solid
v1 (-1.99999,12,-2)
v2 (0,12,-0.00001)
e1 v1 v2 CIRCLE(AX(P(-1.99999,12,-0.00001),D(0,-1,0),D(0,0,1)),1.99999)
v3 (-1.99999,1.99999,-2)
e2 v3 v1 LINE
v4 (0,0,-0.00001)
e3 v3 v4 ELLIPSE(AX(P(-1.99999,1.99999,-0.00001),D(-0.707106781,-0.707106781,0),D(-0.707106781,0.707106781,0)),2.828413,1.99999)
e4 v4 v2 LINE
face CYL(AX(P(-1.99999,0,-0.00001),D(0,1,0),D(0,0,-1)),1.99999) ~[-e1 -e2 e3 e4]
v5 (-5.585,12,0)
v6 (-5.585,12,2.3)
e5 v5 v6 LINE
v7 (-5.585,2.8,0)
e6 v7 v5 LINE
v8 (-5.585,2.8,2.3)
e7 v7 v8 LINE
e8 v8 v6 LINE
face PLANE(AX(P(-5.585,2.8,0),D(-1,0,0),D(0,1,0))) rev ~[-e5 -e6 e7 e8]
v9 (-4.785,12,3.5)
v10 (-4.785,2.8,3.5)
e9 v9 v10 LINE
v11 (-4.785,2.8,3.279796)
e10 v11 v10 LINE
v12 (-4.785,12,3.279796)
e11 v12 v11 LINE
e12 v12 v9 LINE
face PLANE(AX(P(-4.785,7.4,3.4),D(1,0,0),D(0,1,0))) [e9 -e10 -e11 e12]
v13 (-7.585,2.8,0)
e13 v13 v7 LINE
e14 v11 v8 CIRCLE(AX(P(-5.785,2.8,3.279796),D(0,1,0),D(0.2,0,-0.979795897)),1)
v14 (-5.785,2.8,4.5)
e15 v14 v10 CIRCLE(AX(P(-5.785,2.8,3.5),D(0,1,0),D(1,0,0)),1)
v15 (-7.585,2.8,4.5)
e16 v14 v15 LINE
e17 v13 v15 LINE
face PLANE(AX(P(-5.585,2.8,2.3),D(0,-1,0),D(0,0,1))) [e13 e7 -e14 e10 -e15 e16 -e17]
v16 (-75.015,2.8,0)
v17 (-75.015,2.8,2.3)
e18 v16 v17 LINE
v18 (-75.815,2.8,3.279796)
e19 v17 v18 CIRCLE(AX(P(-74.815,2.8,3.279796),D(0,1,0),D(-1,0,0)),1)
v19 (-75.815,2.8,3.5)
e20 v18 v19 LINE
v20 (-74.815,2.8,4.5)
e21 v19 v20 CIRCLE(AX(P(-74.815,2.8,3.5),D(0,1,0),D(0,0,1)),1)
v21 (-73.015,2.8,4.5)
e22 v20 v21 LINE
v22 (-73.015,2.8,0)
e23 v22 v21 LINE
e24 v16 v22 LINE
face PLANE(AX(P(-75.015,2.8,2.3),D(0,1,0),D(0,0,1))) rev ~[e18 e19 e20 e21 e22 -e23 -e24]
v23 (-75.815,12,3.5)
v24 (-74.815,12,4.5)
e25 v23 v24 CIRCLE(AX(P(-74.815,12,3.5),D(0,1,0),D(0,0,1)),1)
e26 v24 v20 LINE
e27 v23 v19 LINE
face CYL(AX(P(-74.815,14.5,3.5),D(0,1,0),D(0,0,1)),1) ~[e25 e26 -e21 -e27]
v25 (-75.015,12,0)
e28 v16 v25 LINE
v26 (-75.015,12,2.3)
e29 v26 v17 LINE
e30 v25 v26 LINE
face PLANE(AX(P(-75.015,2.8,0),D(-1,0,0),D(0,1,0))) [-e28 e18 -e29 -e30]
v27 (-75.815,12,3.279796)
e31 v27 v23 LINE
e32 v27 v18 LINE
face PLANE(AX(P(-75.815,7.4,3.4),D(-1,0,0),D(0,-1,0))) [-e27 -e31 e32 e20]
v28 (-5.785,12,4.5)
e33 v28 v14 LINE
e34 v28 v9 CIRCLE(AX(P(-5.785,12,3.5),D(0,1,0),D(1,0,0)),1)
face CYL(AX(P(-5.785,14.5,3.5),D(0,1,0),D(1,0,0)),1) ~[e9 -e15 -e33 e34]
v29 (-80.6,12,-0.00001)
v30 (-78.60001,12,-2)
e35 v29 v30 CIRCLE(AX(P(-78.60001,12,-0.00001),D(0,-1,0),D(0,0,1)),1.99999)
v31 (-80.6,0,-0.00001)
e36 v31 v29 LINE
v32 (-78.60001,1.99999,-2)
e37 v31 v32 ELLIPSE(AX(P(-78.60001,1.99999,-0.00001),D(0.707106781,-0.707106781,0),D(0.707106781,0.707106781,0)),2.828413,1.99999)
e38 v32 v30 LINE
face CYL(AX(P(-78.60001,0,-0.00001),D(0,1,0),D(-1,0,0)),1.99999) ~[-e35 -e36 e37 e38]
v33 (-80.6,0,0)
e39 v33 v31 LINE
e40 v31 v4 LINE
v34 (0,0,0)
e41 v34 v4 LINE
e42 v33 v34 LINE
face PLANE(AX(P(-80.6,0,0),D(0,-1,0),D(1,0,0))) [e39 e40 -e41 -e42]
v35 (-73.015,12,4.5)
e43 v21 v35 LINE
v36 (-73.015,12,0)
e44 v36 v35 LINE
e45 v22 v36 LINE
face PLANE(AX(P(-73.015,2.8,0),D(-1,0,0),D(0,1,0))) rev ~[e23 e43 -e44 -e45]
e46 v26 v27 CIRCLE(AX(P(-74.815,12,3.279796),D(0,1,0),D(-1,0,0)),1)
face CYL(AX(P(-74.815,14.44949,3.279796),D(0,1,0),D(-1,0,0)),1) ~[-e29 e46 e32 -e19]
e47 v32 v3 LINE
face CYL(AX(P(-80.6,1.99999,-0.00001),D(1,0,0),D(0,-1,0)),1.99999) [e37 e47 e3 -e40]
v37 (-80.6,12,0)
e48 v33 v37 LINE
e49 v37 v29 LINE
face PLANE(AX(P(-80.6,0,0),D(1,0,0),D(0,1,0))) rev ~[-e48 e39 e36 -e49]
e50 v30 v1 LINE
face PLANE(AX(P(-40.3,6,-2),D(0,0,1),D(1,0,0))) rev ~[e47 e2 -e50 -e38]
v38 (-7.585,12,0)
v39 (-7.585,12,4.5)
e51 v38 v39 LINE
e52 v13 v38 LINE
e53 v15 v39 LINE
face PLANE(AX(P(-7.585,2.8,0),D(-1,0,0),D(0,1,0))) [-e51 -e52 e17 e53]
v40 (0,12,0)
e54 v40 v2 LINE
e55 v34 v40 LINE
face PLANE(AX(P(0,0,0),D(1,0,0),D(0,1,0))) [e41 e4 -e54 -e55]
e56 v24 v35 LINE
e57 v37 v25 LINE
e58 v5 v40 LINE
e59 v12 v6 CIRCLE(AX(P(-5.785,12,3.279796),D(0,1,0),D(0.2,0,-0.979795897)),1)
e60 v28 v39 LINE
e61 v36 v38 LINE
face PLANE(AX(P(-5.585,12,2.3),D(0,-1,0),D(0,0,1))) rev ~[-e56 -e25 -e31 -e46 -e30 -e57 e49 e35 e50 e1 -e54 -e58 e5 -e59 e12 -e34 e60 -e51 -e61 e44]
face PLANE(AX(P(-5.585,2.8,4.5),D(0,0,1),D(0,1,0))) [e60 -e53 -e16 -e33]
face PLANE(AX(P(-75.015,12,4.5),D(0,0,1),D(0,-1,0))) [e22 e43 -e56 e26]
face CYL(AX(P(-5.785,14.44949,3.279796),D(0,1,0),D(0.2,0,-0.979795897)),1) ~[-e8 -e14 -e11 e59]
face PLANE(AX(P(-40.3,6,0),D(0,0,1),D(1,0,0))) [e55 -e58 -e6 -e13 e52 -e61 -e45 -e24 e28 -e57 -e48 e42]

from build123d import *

# Parameters (mm, degrees)
F0_W        = 80.6
F0_H        = 12
F1_DEPTH    = 2
F2_W        = 2
F2_H        = 9.2
F3_DEPTH    = 4.5
F4_W        = 9.2
F4_H        = 2.2
F5_DEPTH    = 0.8
F6_R        = 1.99999
F7_W        = 9.2
F7_H        = 2.2
F8_DEPTH    = 0.8
F9_T1_DEPTH = 14.0989794856
F9_T3_DEPTH = 14.2


# Not quite as in the source:
# - a fillet or chamfer that OpenCascade refuses, or shapes differently, is made with other operations: its cross-section is extruded or revolved along the edge and cut away or added
# - a fillet or chamfer is up to 0.001 mm smaller than in the source, because OpenCascade refuses the exact size


with BuildPart() as f1:
    # F0 (on Top) → F1 (new body)
    with BuildSketch(Plane.XY):
        with Locations((-40.3, 6)):
            Rectangle(F0_W, F0_H)
    extrude(amount=-F1_DEPTH)

    # F2 (on face) → F3 (join)
    with BuildSketch(Plane.XY):
        with Locations((-74.015, 7.4)):
            Rectangle(F2_W, F2_H)
        with Locations((-6.585, 7.4)):
            Rectangle(F2_W, F2_H)
    extrude(amount=F3_DEPTH)

    # F4 (on face) → F5 (join)
    with BuildSketch(Plane(origin=(-75.015, 0, 0), x_dir=(0, -1, 0), z_dir=(-1, 0, 0))):
        with Locations((-7.4, 3.4)):
            Rectangle(F4_W, F4_H)
    extrude(amount=F5_DEPTH)

    # F6 (radius 2 in the source; OpenCascade refuses exactly that, so slightly less here)
    f6_edges = [f1.edges().sort_by_distance(p)[0] for p in [
        (-80.6, 6, -2),
        (0, 6, -2),
        (-40.3, 0, -2),
    ]]
    fillet(f6_edges, radius=F6_R)

    # F7 (on face) → F8 (join)
    with BuildSketch(Plane.YZ.offset(-5.585)):
        with Locations((7.4, 3.4)):
            Rectangle(F7_W, F7_H)
    extrude(amount=F8_DEPTH)

    # F9: fillet of radius 1 on 4 edges, made by hand

    # F9_s2 → F9_t1 (cut)
    with BuildSketch(Plane.XZ.offset(-14.4494897428)):
        with BuildLine():
            ThreePointArc((-5.585, 2.3), (-5.0104033308, 2.6473403651), (-4.785, 3.2797958971))
            Line((-4.785, 3.2797958971), (-4.785, 2.3))
            Line((-4.785, 2.3), (-5.585, 2.3))
        make_face()
        with BuildLine():
            ThreePointArc((-75.815, 3.2797958971), (-75.5895966692, 2.6473403651), (-75.015, 2.3))
            Line((-75.015, 2.3), (-75.815, 2.3))
            Line((-75.815, 2.3), (-75.815, 3.2797958971))
        make_face()
    extrude(amount=F9_T1_DEPTH, mode=Mode.SUBTRACT)

    # F9_s4 → F9_t3 (cut)
    with BuildSketch(Plane.XZ.offset(-14.5)):
        with BuildLine():
            ThreePointArc((-4.785, 3.5), (-5.0778932188, 4.2071067812), (-5.785, 4.5))
            Line((-5.785, 4.5), (-4.785, 4.5))
            Line((-4.785, 4.5), (-4.785, 3.5))
        make_face()
        with BuildLine():
            ThreePointArc((-74.815, 4.5), (-75.5221067812, 4.2071067812), (-75.815, 3.5))
            Line((-75.815, 3.5), (-75.815, 4.5))
            Line((-75.815, 4.5), (-74.815, 4.5))
        make_face()
    extrude(amount=F9_T3_DEPTH, mode=Mode.SUBTRACT)


solid = f1.part
